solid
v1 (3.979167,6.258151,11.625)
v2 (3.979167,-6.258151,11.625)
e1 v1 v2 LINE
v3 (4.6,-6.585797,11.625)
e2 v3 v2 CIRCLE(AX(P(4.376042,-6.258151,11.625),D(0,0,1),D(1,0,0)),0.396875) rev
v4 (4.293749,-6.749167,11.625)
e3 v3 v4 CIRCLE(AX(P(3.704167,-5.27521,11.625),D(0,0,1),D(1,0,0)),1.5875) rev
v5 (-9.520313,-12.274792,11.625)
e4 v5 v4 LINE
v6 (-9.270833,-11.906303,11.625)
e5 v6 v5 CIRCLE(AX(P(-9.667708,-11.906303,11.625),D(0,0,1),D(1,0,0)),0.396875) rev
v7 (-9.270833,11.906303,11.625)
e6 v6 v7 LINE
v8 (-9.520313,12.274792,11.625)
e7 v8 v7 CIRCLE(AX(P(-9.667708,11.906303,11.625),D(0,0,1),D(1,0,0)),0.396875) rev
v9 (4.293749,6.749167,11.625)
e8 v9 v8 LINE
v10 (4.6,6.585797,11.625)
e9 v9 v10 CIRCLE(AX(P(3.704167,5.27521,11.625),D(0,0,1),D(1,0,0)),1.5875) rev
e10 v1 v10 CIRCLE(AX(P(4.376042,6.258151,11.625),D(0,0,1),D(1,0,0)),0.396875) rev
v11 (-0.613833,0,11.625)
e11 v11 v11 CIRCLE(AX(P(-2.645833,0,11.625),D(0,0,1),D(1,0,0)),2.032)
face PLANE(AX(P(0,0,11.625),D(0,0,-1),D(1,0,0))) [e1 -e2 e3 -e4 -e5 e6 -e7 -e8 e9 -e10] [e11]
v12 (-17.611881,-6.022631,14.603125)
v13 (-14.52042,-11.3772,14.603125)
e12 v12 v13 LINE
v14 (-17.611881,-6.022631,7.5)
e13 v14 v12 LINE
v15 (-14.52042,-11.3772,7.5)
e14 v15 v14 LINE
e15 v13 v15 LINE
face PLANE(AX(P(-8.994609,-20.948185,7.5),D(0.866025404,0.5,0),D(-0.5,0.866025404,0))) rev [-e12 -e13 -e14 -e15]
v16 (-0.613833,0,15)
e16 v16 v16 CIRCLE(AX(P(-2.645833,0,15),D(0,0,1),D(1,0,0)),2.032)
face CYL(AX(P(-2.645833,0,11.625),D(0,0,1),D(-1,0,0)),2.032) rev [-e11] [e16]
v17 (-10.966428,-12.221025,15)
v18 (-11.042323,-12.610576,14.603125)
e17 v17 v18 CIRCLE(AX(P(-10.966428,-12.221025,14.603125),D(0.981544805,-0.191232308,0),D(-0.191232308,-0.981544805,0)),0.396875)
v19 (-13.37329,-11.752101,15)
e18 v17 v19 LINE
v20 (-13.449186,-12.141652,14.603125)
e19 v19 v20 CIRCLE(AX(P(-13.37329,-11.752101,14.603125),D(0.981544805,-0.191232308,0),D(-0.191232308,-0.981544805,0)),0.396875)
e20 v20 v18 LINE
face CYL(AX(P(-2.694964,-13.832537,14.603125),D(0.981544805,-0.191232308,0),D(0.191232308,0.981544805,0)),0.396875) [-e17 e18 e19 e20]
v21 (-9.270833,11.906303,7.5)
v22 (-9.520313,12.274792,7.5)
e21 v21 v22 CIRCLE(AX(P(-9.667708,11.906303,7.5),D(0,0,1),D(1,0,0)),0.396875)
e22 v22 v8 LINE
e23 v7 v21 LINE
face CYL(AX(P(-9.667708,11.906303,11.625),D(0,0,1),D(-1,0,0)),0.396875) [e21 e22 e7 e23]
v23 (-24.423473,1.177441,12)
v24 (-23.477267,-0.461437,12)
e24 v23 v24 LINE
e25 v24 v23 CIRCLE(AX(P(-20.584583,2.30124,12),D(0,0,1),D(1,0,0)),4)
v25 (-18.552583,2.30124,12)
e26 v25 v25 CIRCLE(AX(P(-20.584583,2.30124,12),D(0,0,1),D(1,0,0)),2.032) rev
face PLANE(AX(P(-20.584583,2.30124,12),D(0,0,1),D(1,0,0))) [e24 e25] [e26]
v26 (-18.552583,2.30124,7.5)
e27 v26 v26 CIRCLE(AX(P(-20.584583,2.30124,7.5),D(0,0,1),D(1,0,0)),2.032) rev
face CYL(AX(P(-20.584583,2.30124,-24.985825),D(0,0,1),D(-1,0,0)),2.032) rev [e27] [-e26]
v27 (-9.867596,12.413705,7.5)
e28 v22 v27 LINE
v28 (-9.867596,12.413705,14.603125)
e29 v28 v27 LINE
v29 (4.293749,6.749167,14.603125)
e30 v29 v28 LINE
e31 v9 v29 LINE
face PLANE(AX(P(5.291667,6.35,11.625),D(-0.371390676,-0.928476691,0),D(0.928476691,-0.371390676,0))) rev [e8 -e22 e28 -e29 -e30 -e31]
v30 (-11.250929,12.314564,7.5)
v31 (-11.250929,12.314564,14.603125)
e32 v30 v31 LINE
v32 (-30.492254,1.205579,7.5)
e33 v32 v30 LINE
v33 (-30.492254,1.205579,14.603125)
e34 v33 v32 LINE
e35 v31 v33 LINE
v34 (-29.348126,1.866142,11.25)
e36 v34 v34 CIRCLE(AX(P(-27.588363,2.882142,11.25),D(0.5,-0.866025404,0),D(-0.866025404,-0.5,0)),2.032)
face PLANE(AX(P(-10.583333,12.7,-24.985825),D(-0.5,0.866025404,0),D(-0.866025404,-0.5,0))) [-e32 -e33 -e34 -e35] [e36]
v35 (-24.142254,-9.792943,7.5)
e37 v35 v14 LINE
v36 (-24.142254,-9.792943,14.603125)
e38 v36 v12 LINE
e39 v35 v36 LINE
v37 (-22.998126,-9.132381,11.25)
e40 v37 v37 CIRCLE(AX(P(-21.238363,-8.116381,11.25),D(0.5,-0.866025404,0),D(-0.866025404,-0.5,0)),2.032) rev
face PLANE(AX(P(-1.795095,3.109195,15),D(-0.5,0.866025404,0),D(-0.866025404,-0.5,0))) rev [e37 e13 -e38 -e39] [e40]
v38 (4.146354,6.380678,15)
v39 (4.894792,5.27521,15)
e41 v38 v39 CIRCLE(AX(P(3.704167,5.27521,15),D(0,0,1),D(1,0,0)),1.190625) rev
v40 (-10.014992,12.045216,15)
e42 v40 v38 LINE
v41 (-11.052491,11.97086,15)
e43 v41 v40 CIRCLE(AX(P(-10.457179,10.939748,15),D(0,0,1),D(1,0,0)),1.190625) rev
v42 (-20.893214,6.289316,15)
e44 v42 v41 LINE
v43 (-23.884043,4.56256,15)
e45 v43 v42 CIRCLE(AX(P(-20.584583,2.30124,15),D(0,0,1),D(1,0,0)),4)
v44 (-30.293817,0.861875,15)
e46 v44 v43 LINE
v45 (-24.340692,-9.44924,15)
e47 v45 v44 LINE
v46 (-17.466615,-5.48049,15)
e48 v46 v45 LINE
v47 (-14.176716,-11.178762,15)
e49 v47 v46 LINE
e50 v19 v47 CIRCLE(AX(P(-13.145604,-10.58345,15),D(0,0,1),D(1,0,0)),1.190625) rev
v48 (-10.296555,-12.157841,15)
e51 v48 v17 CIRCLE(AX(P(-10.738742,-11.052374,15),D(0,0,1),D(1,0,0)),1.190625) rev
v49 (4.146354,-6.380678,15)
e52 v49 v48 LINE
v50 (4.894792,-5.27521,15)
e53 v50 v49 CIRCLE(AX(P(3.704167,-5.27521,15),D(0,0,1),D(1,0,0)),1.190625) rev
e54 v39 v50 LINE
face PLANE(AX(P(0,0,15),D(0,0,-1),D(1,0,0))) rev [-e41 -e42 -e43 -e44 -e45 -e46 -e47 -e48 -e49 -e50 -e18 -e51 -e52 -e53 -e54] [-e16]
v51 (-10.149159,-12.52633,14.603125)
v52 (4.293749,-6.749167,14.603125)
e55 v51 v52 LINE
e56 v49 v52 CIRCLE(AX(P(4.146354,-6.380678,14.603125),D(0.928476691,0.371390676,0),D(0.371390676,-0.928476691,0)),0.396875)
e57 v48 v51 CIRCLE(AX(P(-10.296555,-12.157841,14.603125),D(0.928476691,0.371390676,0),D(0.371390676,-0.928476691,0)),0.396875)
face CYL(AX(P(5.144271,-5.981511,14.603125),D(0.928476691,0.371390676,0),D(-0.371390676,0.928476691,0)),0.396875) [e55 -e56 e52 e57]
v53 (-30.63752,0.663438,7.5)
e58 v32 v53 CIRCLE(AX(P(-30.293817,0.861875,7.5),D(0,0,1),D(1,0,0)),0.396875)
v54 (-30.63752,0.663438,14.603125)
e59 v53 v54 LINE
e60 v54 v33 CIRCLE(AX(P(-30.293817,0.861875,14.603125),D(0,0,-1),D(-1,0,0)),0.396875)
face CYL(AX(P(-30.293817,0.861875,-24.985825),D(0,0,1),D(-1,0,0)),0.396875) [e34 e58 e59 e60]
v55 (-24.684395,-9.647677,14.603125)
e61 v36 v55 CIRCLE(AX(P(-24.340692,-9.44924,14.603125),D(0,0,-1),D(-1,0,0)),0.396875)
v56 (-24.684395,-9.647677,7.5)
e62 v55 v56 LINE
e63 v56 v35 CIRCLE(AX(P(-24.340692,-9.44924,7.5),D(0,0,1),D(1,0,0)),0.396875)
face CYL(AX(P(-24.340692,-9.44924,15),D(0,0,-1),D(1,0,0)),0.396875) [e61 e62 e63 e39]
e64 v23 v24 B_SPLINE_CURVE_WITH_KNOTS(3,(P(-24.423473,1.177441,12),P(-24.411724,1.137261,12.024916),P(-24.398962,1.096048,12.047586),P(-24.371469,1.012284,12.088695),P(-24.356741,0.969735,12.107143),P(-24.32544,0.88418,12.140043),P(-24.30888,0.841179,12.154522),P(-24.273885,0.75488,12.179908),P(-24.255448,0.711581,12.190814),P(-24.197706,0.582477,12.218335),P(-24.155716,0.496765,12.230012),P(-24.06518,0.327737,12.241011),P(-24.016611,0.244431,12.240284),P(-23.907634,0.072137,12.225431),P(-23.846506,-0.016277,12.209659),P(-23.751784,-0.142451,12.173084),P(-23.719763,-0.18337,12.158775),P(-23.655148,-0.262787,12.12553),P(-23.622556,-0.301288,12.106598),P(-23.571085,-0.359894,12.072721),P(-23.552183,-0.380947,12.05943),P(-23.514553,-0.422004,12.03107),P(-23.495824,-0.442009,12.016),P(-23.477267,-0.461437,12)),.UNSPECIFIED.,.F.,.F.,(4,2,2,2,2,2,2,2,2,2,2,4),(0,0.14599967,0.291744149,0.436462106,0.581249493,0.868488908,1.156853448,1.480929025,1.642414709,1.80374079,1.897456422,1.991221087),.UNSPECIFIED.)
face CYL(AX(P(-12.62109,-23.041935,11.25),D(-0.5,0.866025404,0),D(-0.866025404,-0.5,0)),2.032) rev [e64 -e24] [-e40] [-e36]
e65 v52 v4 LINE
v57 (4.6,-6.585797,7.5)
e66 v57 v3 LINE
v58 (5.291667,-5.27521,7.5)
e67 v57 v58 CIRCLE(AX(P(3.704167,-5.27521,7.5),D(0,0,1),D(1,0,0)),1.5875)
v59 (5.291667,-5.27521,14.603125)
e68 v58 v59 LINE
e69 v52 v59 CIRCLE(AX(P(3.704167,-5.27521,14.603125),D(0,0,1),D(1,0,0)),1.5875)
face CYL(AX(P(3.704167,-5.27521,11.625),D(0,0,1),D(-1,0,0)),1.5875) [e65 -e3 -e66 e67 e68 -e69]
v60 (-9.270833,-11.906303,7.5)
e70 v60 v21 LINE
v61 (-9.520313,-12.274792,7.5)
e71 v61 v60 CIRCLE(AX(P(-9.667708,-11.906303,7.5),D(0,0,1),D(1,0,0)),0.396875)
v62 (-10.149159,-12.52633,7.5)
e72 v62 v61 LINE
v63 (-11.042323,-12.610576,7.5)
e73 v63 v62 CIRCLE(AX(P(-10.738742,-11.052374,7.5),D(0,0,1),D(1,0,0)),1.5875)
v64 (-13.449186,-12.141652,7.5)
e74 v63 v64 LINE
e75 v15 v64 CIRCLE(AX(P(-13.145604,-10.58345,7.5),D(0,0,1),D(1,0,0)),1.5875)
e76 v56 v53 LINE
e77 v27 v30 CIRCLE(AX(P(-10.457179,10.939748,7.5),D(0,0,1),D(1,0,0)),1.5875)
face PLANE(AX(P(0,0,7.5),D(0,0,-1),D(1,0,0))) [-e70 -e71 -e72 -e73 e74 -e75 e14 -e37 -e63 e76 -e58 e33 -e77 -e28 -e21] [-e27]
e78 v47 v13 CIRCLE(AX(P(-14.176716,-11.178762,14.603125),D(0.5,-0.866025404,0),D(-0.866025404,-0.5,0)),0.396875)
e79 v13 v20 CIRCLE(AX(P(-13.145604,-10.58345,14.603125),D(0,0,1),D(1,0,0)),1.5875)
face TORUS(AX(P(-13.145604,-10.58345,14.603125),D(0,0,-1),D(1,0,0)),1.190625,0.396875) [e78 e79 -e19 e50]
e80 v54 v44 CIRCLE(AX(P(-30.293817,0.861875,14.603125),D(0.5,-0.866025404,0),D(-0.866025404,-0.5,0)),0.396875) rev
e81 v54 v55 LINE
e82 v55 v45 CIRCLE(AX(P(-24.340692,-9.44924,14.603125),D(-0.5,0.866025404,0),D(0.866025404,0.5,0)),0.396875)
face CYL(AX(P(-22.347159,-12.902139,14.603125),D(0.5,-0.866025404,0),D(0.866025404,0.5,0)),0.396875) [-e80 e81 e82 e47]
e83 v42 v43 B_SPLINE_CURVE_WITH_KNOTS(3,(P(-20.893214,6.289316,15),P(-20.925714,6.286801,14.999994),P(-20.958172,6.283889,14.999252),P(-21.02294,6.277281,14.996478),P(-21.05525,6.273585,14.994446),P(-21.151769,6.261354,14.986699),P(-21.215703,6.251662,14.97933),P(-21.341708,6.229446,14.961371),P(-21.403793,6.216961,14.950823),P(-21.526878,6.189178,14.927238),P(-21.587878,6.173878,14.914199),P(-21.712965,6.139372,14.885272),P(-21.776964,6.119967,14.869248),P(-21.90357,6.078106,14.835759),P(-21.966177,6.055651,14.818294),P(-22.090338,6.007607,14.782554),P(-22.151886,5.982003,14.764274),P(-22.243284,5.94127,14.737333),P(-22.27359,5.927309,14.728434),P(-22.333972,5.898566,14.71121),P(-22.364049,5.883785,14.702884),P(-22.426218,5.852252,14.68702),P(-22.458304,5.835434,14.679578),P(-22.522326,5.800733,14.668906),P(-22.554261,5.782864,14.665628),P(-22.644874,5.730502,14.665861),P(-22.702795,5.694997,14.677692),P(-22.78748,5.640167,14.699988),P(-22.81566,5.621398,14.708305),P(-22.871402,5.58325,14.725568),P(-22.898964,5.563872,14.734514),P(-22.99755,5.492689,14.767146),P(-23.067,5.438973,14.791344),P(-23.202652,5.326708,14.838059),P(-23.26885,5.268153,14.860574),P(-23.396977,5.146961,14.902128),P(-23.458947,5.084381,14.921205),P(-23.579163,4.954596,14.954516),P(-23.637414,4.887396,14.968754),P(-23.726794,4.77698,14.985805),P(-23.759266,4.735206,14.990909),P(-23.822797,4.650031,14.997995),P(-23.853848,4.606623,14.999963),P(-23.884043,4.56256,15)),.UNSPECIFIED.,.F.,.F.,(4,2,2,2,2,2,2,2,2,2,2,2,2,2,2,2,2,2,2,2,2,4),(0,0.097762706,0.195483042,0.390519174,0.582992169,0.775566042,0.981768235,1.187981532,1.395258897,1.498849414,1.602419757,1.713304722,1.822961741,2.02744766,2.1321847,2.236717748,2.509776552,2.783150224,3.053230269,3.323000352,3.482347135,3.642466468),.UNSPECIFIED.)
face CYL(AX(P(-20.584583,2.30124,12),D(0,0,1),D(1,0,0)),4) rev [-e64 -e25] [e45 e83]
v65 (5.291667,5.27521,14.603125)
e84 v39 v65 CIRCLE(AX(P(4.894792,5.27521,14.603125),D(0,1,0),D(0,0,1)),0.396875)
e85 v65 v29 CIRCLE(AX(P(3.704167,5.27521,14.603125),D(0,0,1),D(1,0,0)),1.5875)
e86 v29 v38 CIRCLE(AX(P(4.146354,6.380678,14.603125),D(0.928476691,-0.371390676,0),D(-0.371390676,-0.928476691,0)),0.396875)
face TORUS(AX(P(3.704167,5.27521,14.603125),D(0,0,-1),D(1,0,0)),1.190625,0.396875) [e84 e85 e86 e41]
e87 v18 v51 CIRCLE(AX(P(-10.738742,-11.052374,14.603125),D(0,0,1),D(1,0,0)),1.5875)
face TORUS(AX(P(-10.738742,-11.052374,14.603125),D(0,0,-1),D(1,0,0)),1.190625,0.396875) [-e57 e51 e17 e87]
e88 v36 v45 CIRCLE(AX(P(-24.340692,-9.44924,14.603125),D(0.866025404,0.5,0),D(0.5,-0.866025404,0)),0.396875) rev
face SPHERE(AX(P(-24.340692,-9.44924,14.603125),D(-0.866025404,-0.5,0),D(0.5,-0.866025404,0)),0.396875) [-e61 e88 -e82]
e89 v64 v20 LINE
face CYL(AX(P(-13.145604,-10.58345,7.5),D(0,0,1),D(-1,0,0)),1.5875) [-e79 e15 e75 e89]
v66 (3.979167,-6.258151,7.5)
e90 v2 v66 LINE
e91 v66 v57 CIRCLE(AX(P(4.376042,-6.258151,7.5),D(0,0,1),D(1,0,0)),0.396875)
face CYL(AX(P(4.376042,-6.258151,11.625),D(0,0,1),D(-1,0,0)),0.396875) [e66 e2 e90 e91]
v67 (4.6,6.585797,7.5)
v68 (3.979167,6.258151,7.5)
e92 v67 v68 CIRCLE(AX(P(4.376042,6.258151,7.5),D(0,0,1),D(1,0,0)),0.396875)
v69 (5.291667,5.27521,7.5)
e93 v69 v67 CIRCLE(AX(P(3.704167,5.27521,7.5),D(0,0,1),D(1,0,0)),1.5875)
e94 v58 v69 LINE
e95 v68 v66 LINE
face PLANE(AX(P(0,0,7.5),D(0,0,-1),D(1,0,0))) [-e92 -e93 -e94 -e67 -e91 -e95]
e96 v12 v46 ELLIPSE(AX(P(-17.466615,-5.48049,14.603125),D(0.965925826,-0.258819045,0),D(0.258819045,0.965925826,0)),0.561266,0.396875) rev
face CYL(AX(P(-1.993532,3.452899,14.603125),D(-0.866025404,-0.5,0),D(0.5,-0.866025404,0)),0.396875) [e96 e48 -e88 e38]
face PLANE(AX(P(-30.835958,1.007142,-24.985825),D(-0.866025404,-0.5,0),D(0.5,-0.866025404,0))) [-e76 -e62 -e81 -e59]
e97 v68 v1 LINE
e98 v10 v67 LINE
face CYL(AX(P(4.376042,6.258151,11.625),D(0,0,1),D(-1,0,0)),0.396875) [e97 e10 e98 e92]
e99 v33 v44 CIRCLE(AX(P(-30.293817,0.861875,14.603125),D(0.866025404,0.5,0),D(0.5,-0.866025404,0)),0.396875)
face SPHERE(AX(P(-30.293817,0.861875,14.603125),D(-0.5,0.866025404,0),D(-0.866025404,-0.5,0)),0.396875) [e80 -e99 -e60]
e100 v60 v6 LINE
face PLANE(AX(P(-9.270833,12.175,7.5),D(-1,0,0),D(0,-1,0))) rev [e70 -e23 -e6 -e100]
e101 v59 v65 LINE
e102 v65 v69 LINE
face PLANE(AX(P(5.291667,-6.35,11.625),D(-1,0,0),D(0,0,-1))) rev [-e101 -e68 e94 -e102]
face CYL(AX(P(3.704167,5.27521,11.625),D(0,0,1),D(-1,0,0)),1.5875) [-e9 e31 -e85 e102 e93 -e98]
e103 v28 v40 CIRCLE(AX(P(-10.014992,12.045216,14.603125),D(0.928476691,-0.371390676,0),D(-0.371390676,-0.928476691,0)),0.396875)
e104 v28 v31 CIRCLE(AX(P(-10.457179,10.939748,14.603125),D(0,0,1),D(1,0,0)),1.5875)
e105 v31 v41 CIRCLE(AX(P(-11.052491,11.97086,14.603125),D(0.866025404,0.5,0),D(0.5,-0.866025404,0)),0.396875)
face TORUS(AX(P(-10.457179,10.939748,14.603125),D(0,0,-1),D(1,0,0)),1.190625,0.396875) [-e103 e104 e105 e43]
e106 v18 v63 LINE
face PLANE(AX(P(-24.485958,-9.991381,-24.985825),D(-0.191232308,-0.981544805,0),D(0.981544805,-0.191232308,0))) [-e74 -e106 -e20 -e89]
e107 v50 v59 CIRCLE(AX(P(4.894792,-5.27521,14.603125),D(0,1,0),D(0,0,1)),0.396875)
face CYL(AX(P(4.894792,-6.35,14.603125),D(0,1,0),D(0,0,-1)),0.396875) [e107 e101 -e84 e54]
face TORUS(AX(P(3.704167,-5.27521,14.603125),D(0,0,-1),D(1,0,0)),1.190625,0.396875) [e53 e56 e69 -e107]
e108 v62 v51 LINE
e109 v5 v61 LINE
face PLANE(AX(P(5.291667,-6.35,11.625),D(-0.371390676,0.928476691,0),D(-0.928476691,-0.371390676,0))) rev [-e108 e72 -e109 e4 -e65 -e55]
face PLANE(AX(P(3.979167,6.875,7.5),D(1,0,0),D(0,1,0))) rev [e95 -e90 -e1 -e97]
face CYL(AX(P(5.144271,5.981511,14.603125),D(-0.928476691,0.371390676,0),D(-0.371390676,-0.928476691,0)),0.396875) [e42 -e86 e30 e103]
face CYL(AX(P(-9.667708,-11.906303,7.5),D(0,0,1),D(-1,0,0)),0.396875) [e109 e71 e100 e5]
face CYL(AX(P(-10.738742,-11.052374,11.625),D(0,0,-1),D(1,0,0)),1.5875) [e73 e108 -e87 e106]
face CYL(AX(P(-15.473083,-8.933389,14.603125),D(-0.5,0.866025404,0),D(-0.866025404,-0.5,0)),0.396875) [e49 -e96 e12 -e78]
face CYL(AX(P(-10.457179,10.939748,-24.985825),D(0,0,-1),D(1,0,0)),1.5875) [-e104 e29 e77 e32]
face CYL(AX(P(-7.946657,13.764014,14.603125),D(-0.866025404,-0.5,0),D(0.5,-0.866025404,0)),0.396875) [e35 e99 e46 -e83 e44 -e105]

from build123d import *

# Parameters (mm, degrees)
SKETCH1_R           = 2.032
BOSS_EXTRUDE1_DEPTH = 3.375
BOSS_EXTRUDE2_DEPTH = 4.125
SKETCH4_R           = 2.032
BOSS_EXTRUDE3_DEPTH = 7.5
SKETCH5_R           = 2.032
CUT_EXTRUDE1_DEPTH  = 36.913493423
SKETCH6_W           = 7.9375
SKETCH6_H           = 7.5
CUT_EXTRUDE2_DEPTH  = 34.905049671
FILLET1_R           = 1.5875
FILLET2_R           = 0.396875
SKETCH7_R           = 4
CUT_EXTRUDE3_DEPTH  = 3


with BuildPart() as part:
    # Sketch1 → Boss-Extrude1 (new body)
    with BuildSketch(Plane.XY):
        Polygon((5.291666667, -6.35), (-10.583333333, -12.7), (-10.583333333, 12.7), (5.291666667, 6.35), align=None)
        with Locations((-2.645833333, 0)):
            Circle(SKETCH1_R, mode=Mode.SUBTRACT)
    extrude(amount=BOSS_EXTRUDE1_DEPTH)

    # Sketch2 → Boss-Extrude2 (add)
    with BuildSketch(Plane.XY.offset(3.375)):
        Polygon((-10.583333333, 12.7), (-10.583333333, -12.7), (-9.270833333, -12.175), (-9.270833333, 12.175), align=None)
        Polygon((5.291666667, 6.35), (5.291666667, -6.35), (3.979166667, -6.875), (3.979166667, 6.875), align=None)
    extrude(amount=BOSS_EXTRUDE2_DEPTH)

    # Sketch4 → Boss-Extrude3 (add)
    with BuildSketch(Plane(origin=(0, 0, 0), x_dir=(-1, 0, 0), z_dir=(0, 0, -1))):
        Polygon((10.583333333, 12.7), (30.835957968, 1.007141715), (24.485957968, -9.991380913), (10.583333333, -12.7), align=None)
        with Locations((20.584583333, 2.30124)):
            Circle(SKETCH4_R, mode=Mode.SUBTRACT)
    extrude(amount=-BOSS_EXTRUDE3_DEPTH)

    # Sketch5 → Cut-Extrude1 (cut, through all)
    with BuildSketch(Plane(origin=(-8.145094647, 14.107717762, 0), x_dir=(0.8660254037844418, 0.49999999999999467, 0), z_dir=(-0.49999999999999467, 0.8660254037844418, 0))):
        with Locations(Location((-22.451152093, -3.75, 0), (0, 0, 180))):
            Circle(SKETCH5_R)
    extrude(amount=-CUT_EXTRUDE1_DEPTH, mode=Mode.SUBTRACT)

    # Sketch6 → Cut-Extrude2 (cut, through all)
    with BuildSketch(Plane(origin=(-1.795094647, 3.109195134, 0), x_dir=(0.8660254037844418, 0.49999999999999467, 0), z_dir=(-0.49999999999999467, 0.8660254037844418, 0))):
        with Locations((-22.232402093, -3.75)):
            Rectangle(SKETCH6_W, SKETCH6_H)
    extrude(amount=-CUT_EXTRUDE2_DEPTH, mode=Mode.SUBTRACT)

    # Fillet1
    fillet1_edges = [part.edges().sort_by_distance(p)[0] for p in [
        (-14.158893581, -12.003381125, 3.75),
        (-10.583333333, 12.7, 3.75),
        (5.291666667, 6.35, 3.75),
        (5.291666667, -6.35, 3.75),
        (-10.583333333, -12.7, 3.75),
    ]]
    fillet(fillet1_edges, radius=FILLET1_R)

    # Fillet2
    # the kernel refuses this fillet: 0.396875 mm, written as the material it takes off along each edge
    with BuildSketch(Plane(origin=(-30.293816636, 0.861875383, 0.396875), x_dir=(-0.49999999999999467, 0.8660254037844418, 0), z_dir=(0, 0, -1))) as fillet2_piece_1_section:
        Polygon((0, 0), (FILLET2_R, 0), (FILLET2_R, -FILLET2_R), (0, -FILLET2_R), align=None)
    fillet2_piece_1 = extrude(amount=FILLET2_R, mode=Mode.PRIVATE)
    fillet2_piece_1 = fillet2_piece_1 - Plane(origin=(-30.293816636, 0.861875383, 0.396875), x_dir=(0.9659258262890668, -0.25881904510252635, 0), z_dir=(0, 0, -1)) * Sphere(FILLET2_R, mode=Mode.PRIVATE)
    add(fillet2_piece_1, mode=Mode.SUBTRACT)
    with BuildSketch(Plane(origin=(-24.340691636, -9.449239581, 0.396875), x_dir=(0, 0, -1), z_dir=(0.49999999999999467, -0.8660254037844418, 0))) as fillet2_piece_2_section:
        Polygon((0, 0), (FILLET2_R, 0), (FILLET2_R, -FILLET2_R), (0, -FILLET2_R), align=None)
    fillet2_piece_2 = extrude(amount=FILLET2_R, mode=Mode.PRIVATE)
    fillet2_piece_2 = fillet2_piece_2 - Plane(origin=(-24.340691636, -9.449239581, 0.396875), x_dir=(0.6123724356957964, 0.35355339059327046, 0.7071067811865475), z_dir=(0.49999999999999467, -0.8660254037844418, 0)) * Sphere(FILLET2_R, mode=Mode.PRIVATE)
    add(fillet2_piece_2, mode=Mode.SUBTRACT)
    with BuildSketch(Plane(origin=(-9.270833333, 12.175, 3.375), x_dir=(0, -1, 0), z_dir=(0, 0, 1)), Plane(origin=(-9.270833333, -12.175, 3.375), x_dir=(-0.9284766908852634, -0.37139067635409345, 0), z_dir=(0, 0, 1))) as fillet2_piece_3:
        with BuildLine():
            CenterArc((FILLET2_R * 0.677032961427, -FILLET2_R), FILLET2_R, 90, 68.198590514)
            Line((-FILLET2_R * 0.251443729458, -FILLET2_R * 0.628609323646), (0, 0))
            Line((0, 0), (FILLET2_R * 0.677032961427, 0))
        make_face()
    extrude(amount=4.796743641, mode=Mode.SUBTRACT)
    with BuildSketch(Plane(origin=(3.979166667, 6.875, 3.375), x_dir=(0, -1, 0), z_dir=(0, 0, 1))) as fillet2_piece_4:
        with BuildLine():
            CenterArc((0.616849403, 0.396875), FILLET2_R, 145.645994163, 124.354005837)
            Line((0.289202596, 0.620833333), (0.256437915, 0.643229167))
            ThreePointArc((0.256437915, 0.643229167), (0.088984161, 0.329322266), (-0.036848919, 0.014739567))
            Line((-0.036848919, 0.014739567), (0, -0.0396875))
            Line((0, -0.0396875), (0.616849403, -0.0396875))
            Line((0.616849403, -0.0396875), (0.616849403, 0))
        make_face()
    extrude(amount=5.837221089, mode=Mode.SUBTRACT)
    with BuildSketch(Plane(origin=(3.979166667, -6.875, 3.375), x_dir=(0.9064736694503883, 0.4222623433283487, 0), z_dir=(0, 0, 1))) as fillet2_piece_5:
        with BuildLine():
            CenterArc((0.620229012, 0.391572375), FILLET2_R, 155.022498711, 124.354005837)
            Line((0.260472275, 0.559157742), (0.224496601, 0.575916279))
            Line((0.224496601, 0.575916279), (-0.035975674, 0.016758537))
            Line((-0.035975674, 0.016758537), (-0.002198881, -0.039626539))
            ThreePointArc((-0.002198881, -0.039626539), (0.336096623, -0.058398593), (0.691354378, -0.039157237))
            Line((0.691354378, -0.039157237), (0.684888436, 0))
        make_face()
    extrude(amount=5.837221089, mode=Mode.SUBTRACT)
    with BuildSketch(Plane(origin=(-30.835957968, 1.007141715, 0.396875), x_dir=(0.866025403784441, 0.4999999999999959, 0), z_dir=(0, 0, 1)), Plane(origin=(-24.485957968, -9.991380913, 0.396875), x_dir=(-0.4999999999999916, 0.8660254037844436, 0), z_dir=(0, 0, 1))) as fillet2_piece_6:
        with BuildLine():
            CenterArc((FILLET2_R, -FILLET2_R), FILLET2_R, 90, 90)
            Line((0, -FILLET2_R), (0, 0))
            Line((0, 0), (FILLET2_R, 0))
        make_face()
    extrude(amount=8.0953125, mode=Mode.SUBTRACT)
    with BuildSketch(Plane(origin=(-30.637520468, 0.663437883, 0), x_dir=(0.8660254037844414, 0.4999999999999952, 0), z_dir=(0.49999999999999534, -0.8660254037844414, 0))) as fillet2_piece_7:
        with BuildLine():
            CenterArc((FILLET2_R, FILLET2_R), FILLET2_R, 180, 90)
            Line((0, FILLET2_R), (0, 0))
            Line((0, 0), (FILLET2_R, 0))
        make_face()
    extrude(amount=11.90625, mode=Mode.SUBTRACT)
    with BuildSketch(Plane(origin=(-11.250928686, 12.314563643, 0), x_dir=(0.49999999999999467, -0.8660254037844418, 0), z_dir=(-0.8660254037844418, -0.49999999999999467, 0))) as fillet2_piece_8:
        with BuildLine():
            CenterArc((FILLET2_R, FILLET2_R), FILLET2_R, 180, 90)
            Line((0, FILLET2_R), (0, 0))
            Line((0, 0), (FILLET2_R, 0))
        make_face()
    extrude(amount=22.217968856, mode=Mode.SUBTRACT)
    with BuildSketch(Plane(origin=(-17.611881326, -6.022630913, 0), x_dir=(-0.49999999999999467, 0.8660254037844418, 0), z_dir=(-0.8660254037844418, -0.49999999999999467, 0))) as fillet2_piece_9:
        with BuildLine():
            CenterArc((FILLET2_R, -FILLET2_R), FILLET2_R, 90, 90)
            Line((0, -FILLET2_R), (0, 0))
            Line((0, 0), (FILLET2_R, 0))
        make_face()
    extrude(amount=7.540625, mode=Mode.SUBTRACT)
    with BuildSketch(Plane(origin=(-17.611881326, -6.022630913, 0), x_dir=(0.8660254037844417, 0.49999999999999467, 0), z_dir=(0.4999999999999947, -0.8660254037844418, 0))) as fillet2_piece_10:
        with BuildLine():
            CenterArc((FILLET2_R, FILLET2_R), FILLET2_R, 180, 90)
            Line((0, FILLET2_R), (0, 0))
            Line((0, 0), (FILLET2_R, 0))
        make_face()
    extrude(amount=6.182923419, mode=Mode.SUBTRACT)
    with BuildSketch(Plane(origin=(-13.449185577, -12.141652041, 0), x_dir=(0.19123230784154585, 0.9815448051095764, 0), z_dir=(0.9815448051095764, -0.19123230784154585, 0))) as fillet2_piece_11:
        with BuildLine():
            CenterArc((FILLET2_R, FILLET2_R), FILLET2_R, 180, 90)
            Line((0, FILLET2_R), (0, 0))
            Line((0, 0), (FILLET2_R, 0))
        make_face()
    extrude(amount=2.452116689, mode=Mode.SUBTRACT)
    with BuildSketch(Plane(origin=(-9.867595987, 12.413705062, 0), x_dir=(-0.37139067635410367, -0.9284766908852593, 0), z_dir=(0.9284766908852594, -0.3713906763541037, 0))) as fillet2_piece_12:
        with BuildLine():
            CenterArc((FILLET2_R, -FILLET2_R), FILLET2_R, 90, 90)
            Line((0, -FILLET2_R), (0, 0))
            Line((0, 0), (FILLET2_R, 0))
        make_face()
    extrude(amount=15.252235723, mode=Mode.SUBTRACT)
    with BuildSketch(Plane(origin=(5.291666667, 5.275210174, 0), x_dir=(-1, 0, 0), z_dir=(0, -1, 0))) as fillet2_piece_13:
        with BuildLine():
            CenterArc((FILLET2_R, -FILLET2_R), FILLET2_R, 90, 90)
            Line((0, -FILLET2_R), (0, 0))
            Line((0, 0), (FILLET2_R, 0))
        make_face()
    extrude(amount=10.550420347, mode=Mode.SUBTRACT)
    with BuildSketch(Plane(origin=(4.293749365, -6.749166921, 0), x_dir=(0, 0, 1), z_dir=(-0.9284766908852594, -0.3713906763541037, 0))) as fillet2_piece_14:
        with BuildLine():
            CenterArc((FILLET2_R, FILLET2_R), FILLET2_R, 180, 90)
            Line((0, FILLET2_R), (0, 0))
            Line((0, 0), (FILLET2_R, 0))
        make_face()
    extrude(amount=15.555488575, mode=Mode.SUBTRACT)
    with BuildSketch(Plane(origin=(-10.73874189, -11.052373597, 0), x_dir=(0.37139067635410195, -0.92847669088526, 0), z_dir=(0.92847669088526, 0.37139067635410195, 0))) as fillet2_piece_15:
        with BuildLine():
            CenterArc((1.5875 - FILLET2_R, -FILLET2_R), FILLET2_R, 0, 90)
            Line((1.5875, -FILLET2_R), (1.5875, 0))
            Line((1.5875, 0), (1.5875 - FILLET2_R, 0))
        make_face()
    revolve(axis=Axis((-10.73874189, -11.052373597, 0), (0, 0, -1)), revolution_arc=32.826118495, mode=Mode.SUBTRACT)
    with BuildSketch(Plane(origin=(3.704166667, 5.275210174, 0), x_dir=(1, 0, 0), z_dir=(0, -1, 0))) as fillet2_piece_16:
        with BuildLine():
            CenterArc((1.5875 - FILLET2_R, FILLET2_R), FILLET2_R, 270, 90)
            Line((1.5875, FILLET2_R), (1.5875, 0))
            Line((1.5875, 0), (1.5875 - FILLET2_R, 0))
        make_face()
    revolve(axis=Axis((3.704166667, 5.275210174, 0), (0, 0, 1)), revolution_arc=68.198590514, mode=Mode.SUBTRACT)
    with BuildSketch(Plane(origin=(3.704166667, -5.275210174, 0), x_dir=(0.37139067635410355, -0.9284766908852593, 0), z_dir=(-0.9284766908852593, -0.37139067635410355, 0))) as fillet2_piece_17:
        with BuildLine():
            CenterArc((1.5875 - FILLET2_R, FILLET2_R), FILLET2_R, 270, 90)
            Line((1.5875 - FILLET2_R, 0), (1.5875, 0))
            Line((1.5875, 0), (1.5875, FILLET2_R))
        make_face()
    revolve(axis=Axis((3.704166667, -5.275210174, 0), (0, 0, 1)), revolution_arc=68.198590514, mode=Mode.SUBTRACT)
    with BuildSketch(Plane(origin=(-10.457178686, 10.939748315, 0), x_dir=(0.37139067635410433, 0.9284766908852591, 0), z_dir=(0.9284766908852591, -0.37139067635410433, 0))) as fillet2_piece_18:
        with BuildLine():
            CenterArc((1.5875 - FILLET2_R, FILLET2_R), FILLET2_R, 270, 90)
            Line((1.5875, FILLET2_R), (1.5875, 0))
            Line((1.5875, 0), (1.5875 - FILLET2_R, 0))
        make_face()
    revolve(axis=Axis((-10.457178686, 10.939748315, 0), (0, 0, 1)), revolution_arc=51.801409486, mode=Mode.SUBTRACT)
    with BuildSketch(Plane(origin=(-13.145604288, -10.583449663, 0), x_dir=(-0.19123230784154518, -0.9815448051095765, 0), z_dir=(0.9815448051095765, -0.19123230784154518, 0))) as fillet2_piece_19:
        with BuildLine():
            CenterArc((1.5875 - FILLET2_R, -FILLET2_R), FILLET2_R, 0, 90)
            Line((1.5875, -FILLET2_R), (1.5875, 0))
            Line((1.5875, 0), (1.5875 - FILLET2_R, 0))
        make_face()
    revolve(axis=Axis((-13.145604288, -10.583449663, 0), (0, 0, -1)), revolution_arc=48.975290991, mode=Mode.SUBTRACT)
    with BuildSketch(Plane(origin=(-16.752621745, -5.526537163, 0), x_dir=(-0.49999999999999467, 0.8660254037844418, 0), z_dir=(-0.8660254037844418, -0.49999999999999467, 0))) as fillet2_piece_20a_section:
        with BuildLine():
            CenterArc((FILLET2_R, -FILLET2_R), FILLET2_R, 90, 90)
            Line((0, -FILLET2_R), (0, 0))
            Line((0, 0), (FILLET2_R, 0))
        make_face()
    fillet2_piece_20a = extrude(amount=8.5328125, mode=Mode.PRIVATE)
    fillet2_piece_20a = split(fillet2_piece_20a, bisect_by=Plane(origin=(-17.656806606, -5.944818045, 0.089850561), z_dir=(0.8660254037844418, 0.4999999999999947, 0)), keep=Keep.TOP, mode=Mode.PRIVATE)
    with BuildSketch(Plane(origin=(-18.107975076, -5.163371333, 0), x_dir=(0.8660254037844417, 0.49999999999999467, 0), z_dir=(0.4999999999999947, -0.8660254037844418, 0))) as fillet2_piece_20b_section:
        with BuildLine():
            CenterArc((FILLET2_R, FILLET2_R), FILLET2_R, 180, 90)
            Line((0, FILLET2_R), (0, 0))
            Line((0, 0), (FILLET2_R, 0))
        make_face()
    fillet2_piece_20b = extrude(amount=7.175110919, mode=Mode.PRIVATE)
    fillet2_piece_20b = split(fillet2_piece_20b, bisect_by=Plane(origin=(-17.534068457, -5.977705632, 0.089850561), z_dir=(-0.49999999999999467, 0.8660254037844418, 0)), keep=Keep.TOP, mode=Mode.PRIVATE)
    fillet2_piece_20 = fillet2_piece_20a & fillet2_piece_20b
    add(fillet2_piece_20, mode=Mode.SUBTRACT)


with BuildPart() as body_2:
    # Mirror1: mirrored copy
    add(part.part.mirror(Plane.XY.offset(7.5)))

    # Sketch7 → Cut-Extrude3 (cut)
    with BuildSketch(Plane.XY.offset(15)):
        with Locations(Location((-20.584583333, 2.30124, 0), (0, 0, 94.425213479))):
            Circle(SKETCH7_R)
    extrude(amount=-CUT_EXTRUDE3_DEPTH, mode=Mode.SUBTRACT)


solid = body_2.part
